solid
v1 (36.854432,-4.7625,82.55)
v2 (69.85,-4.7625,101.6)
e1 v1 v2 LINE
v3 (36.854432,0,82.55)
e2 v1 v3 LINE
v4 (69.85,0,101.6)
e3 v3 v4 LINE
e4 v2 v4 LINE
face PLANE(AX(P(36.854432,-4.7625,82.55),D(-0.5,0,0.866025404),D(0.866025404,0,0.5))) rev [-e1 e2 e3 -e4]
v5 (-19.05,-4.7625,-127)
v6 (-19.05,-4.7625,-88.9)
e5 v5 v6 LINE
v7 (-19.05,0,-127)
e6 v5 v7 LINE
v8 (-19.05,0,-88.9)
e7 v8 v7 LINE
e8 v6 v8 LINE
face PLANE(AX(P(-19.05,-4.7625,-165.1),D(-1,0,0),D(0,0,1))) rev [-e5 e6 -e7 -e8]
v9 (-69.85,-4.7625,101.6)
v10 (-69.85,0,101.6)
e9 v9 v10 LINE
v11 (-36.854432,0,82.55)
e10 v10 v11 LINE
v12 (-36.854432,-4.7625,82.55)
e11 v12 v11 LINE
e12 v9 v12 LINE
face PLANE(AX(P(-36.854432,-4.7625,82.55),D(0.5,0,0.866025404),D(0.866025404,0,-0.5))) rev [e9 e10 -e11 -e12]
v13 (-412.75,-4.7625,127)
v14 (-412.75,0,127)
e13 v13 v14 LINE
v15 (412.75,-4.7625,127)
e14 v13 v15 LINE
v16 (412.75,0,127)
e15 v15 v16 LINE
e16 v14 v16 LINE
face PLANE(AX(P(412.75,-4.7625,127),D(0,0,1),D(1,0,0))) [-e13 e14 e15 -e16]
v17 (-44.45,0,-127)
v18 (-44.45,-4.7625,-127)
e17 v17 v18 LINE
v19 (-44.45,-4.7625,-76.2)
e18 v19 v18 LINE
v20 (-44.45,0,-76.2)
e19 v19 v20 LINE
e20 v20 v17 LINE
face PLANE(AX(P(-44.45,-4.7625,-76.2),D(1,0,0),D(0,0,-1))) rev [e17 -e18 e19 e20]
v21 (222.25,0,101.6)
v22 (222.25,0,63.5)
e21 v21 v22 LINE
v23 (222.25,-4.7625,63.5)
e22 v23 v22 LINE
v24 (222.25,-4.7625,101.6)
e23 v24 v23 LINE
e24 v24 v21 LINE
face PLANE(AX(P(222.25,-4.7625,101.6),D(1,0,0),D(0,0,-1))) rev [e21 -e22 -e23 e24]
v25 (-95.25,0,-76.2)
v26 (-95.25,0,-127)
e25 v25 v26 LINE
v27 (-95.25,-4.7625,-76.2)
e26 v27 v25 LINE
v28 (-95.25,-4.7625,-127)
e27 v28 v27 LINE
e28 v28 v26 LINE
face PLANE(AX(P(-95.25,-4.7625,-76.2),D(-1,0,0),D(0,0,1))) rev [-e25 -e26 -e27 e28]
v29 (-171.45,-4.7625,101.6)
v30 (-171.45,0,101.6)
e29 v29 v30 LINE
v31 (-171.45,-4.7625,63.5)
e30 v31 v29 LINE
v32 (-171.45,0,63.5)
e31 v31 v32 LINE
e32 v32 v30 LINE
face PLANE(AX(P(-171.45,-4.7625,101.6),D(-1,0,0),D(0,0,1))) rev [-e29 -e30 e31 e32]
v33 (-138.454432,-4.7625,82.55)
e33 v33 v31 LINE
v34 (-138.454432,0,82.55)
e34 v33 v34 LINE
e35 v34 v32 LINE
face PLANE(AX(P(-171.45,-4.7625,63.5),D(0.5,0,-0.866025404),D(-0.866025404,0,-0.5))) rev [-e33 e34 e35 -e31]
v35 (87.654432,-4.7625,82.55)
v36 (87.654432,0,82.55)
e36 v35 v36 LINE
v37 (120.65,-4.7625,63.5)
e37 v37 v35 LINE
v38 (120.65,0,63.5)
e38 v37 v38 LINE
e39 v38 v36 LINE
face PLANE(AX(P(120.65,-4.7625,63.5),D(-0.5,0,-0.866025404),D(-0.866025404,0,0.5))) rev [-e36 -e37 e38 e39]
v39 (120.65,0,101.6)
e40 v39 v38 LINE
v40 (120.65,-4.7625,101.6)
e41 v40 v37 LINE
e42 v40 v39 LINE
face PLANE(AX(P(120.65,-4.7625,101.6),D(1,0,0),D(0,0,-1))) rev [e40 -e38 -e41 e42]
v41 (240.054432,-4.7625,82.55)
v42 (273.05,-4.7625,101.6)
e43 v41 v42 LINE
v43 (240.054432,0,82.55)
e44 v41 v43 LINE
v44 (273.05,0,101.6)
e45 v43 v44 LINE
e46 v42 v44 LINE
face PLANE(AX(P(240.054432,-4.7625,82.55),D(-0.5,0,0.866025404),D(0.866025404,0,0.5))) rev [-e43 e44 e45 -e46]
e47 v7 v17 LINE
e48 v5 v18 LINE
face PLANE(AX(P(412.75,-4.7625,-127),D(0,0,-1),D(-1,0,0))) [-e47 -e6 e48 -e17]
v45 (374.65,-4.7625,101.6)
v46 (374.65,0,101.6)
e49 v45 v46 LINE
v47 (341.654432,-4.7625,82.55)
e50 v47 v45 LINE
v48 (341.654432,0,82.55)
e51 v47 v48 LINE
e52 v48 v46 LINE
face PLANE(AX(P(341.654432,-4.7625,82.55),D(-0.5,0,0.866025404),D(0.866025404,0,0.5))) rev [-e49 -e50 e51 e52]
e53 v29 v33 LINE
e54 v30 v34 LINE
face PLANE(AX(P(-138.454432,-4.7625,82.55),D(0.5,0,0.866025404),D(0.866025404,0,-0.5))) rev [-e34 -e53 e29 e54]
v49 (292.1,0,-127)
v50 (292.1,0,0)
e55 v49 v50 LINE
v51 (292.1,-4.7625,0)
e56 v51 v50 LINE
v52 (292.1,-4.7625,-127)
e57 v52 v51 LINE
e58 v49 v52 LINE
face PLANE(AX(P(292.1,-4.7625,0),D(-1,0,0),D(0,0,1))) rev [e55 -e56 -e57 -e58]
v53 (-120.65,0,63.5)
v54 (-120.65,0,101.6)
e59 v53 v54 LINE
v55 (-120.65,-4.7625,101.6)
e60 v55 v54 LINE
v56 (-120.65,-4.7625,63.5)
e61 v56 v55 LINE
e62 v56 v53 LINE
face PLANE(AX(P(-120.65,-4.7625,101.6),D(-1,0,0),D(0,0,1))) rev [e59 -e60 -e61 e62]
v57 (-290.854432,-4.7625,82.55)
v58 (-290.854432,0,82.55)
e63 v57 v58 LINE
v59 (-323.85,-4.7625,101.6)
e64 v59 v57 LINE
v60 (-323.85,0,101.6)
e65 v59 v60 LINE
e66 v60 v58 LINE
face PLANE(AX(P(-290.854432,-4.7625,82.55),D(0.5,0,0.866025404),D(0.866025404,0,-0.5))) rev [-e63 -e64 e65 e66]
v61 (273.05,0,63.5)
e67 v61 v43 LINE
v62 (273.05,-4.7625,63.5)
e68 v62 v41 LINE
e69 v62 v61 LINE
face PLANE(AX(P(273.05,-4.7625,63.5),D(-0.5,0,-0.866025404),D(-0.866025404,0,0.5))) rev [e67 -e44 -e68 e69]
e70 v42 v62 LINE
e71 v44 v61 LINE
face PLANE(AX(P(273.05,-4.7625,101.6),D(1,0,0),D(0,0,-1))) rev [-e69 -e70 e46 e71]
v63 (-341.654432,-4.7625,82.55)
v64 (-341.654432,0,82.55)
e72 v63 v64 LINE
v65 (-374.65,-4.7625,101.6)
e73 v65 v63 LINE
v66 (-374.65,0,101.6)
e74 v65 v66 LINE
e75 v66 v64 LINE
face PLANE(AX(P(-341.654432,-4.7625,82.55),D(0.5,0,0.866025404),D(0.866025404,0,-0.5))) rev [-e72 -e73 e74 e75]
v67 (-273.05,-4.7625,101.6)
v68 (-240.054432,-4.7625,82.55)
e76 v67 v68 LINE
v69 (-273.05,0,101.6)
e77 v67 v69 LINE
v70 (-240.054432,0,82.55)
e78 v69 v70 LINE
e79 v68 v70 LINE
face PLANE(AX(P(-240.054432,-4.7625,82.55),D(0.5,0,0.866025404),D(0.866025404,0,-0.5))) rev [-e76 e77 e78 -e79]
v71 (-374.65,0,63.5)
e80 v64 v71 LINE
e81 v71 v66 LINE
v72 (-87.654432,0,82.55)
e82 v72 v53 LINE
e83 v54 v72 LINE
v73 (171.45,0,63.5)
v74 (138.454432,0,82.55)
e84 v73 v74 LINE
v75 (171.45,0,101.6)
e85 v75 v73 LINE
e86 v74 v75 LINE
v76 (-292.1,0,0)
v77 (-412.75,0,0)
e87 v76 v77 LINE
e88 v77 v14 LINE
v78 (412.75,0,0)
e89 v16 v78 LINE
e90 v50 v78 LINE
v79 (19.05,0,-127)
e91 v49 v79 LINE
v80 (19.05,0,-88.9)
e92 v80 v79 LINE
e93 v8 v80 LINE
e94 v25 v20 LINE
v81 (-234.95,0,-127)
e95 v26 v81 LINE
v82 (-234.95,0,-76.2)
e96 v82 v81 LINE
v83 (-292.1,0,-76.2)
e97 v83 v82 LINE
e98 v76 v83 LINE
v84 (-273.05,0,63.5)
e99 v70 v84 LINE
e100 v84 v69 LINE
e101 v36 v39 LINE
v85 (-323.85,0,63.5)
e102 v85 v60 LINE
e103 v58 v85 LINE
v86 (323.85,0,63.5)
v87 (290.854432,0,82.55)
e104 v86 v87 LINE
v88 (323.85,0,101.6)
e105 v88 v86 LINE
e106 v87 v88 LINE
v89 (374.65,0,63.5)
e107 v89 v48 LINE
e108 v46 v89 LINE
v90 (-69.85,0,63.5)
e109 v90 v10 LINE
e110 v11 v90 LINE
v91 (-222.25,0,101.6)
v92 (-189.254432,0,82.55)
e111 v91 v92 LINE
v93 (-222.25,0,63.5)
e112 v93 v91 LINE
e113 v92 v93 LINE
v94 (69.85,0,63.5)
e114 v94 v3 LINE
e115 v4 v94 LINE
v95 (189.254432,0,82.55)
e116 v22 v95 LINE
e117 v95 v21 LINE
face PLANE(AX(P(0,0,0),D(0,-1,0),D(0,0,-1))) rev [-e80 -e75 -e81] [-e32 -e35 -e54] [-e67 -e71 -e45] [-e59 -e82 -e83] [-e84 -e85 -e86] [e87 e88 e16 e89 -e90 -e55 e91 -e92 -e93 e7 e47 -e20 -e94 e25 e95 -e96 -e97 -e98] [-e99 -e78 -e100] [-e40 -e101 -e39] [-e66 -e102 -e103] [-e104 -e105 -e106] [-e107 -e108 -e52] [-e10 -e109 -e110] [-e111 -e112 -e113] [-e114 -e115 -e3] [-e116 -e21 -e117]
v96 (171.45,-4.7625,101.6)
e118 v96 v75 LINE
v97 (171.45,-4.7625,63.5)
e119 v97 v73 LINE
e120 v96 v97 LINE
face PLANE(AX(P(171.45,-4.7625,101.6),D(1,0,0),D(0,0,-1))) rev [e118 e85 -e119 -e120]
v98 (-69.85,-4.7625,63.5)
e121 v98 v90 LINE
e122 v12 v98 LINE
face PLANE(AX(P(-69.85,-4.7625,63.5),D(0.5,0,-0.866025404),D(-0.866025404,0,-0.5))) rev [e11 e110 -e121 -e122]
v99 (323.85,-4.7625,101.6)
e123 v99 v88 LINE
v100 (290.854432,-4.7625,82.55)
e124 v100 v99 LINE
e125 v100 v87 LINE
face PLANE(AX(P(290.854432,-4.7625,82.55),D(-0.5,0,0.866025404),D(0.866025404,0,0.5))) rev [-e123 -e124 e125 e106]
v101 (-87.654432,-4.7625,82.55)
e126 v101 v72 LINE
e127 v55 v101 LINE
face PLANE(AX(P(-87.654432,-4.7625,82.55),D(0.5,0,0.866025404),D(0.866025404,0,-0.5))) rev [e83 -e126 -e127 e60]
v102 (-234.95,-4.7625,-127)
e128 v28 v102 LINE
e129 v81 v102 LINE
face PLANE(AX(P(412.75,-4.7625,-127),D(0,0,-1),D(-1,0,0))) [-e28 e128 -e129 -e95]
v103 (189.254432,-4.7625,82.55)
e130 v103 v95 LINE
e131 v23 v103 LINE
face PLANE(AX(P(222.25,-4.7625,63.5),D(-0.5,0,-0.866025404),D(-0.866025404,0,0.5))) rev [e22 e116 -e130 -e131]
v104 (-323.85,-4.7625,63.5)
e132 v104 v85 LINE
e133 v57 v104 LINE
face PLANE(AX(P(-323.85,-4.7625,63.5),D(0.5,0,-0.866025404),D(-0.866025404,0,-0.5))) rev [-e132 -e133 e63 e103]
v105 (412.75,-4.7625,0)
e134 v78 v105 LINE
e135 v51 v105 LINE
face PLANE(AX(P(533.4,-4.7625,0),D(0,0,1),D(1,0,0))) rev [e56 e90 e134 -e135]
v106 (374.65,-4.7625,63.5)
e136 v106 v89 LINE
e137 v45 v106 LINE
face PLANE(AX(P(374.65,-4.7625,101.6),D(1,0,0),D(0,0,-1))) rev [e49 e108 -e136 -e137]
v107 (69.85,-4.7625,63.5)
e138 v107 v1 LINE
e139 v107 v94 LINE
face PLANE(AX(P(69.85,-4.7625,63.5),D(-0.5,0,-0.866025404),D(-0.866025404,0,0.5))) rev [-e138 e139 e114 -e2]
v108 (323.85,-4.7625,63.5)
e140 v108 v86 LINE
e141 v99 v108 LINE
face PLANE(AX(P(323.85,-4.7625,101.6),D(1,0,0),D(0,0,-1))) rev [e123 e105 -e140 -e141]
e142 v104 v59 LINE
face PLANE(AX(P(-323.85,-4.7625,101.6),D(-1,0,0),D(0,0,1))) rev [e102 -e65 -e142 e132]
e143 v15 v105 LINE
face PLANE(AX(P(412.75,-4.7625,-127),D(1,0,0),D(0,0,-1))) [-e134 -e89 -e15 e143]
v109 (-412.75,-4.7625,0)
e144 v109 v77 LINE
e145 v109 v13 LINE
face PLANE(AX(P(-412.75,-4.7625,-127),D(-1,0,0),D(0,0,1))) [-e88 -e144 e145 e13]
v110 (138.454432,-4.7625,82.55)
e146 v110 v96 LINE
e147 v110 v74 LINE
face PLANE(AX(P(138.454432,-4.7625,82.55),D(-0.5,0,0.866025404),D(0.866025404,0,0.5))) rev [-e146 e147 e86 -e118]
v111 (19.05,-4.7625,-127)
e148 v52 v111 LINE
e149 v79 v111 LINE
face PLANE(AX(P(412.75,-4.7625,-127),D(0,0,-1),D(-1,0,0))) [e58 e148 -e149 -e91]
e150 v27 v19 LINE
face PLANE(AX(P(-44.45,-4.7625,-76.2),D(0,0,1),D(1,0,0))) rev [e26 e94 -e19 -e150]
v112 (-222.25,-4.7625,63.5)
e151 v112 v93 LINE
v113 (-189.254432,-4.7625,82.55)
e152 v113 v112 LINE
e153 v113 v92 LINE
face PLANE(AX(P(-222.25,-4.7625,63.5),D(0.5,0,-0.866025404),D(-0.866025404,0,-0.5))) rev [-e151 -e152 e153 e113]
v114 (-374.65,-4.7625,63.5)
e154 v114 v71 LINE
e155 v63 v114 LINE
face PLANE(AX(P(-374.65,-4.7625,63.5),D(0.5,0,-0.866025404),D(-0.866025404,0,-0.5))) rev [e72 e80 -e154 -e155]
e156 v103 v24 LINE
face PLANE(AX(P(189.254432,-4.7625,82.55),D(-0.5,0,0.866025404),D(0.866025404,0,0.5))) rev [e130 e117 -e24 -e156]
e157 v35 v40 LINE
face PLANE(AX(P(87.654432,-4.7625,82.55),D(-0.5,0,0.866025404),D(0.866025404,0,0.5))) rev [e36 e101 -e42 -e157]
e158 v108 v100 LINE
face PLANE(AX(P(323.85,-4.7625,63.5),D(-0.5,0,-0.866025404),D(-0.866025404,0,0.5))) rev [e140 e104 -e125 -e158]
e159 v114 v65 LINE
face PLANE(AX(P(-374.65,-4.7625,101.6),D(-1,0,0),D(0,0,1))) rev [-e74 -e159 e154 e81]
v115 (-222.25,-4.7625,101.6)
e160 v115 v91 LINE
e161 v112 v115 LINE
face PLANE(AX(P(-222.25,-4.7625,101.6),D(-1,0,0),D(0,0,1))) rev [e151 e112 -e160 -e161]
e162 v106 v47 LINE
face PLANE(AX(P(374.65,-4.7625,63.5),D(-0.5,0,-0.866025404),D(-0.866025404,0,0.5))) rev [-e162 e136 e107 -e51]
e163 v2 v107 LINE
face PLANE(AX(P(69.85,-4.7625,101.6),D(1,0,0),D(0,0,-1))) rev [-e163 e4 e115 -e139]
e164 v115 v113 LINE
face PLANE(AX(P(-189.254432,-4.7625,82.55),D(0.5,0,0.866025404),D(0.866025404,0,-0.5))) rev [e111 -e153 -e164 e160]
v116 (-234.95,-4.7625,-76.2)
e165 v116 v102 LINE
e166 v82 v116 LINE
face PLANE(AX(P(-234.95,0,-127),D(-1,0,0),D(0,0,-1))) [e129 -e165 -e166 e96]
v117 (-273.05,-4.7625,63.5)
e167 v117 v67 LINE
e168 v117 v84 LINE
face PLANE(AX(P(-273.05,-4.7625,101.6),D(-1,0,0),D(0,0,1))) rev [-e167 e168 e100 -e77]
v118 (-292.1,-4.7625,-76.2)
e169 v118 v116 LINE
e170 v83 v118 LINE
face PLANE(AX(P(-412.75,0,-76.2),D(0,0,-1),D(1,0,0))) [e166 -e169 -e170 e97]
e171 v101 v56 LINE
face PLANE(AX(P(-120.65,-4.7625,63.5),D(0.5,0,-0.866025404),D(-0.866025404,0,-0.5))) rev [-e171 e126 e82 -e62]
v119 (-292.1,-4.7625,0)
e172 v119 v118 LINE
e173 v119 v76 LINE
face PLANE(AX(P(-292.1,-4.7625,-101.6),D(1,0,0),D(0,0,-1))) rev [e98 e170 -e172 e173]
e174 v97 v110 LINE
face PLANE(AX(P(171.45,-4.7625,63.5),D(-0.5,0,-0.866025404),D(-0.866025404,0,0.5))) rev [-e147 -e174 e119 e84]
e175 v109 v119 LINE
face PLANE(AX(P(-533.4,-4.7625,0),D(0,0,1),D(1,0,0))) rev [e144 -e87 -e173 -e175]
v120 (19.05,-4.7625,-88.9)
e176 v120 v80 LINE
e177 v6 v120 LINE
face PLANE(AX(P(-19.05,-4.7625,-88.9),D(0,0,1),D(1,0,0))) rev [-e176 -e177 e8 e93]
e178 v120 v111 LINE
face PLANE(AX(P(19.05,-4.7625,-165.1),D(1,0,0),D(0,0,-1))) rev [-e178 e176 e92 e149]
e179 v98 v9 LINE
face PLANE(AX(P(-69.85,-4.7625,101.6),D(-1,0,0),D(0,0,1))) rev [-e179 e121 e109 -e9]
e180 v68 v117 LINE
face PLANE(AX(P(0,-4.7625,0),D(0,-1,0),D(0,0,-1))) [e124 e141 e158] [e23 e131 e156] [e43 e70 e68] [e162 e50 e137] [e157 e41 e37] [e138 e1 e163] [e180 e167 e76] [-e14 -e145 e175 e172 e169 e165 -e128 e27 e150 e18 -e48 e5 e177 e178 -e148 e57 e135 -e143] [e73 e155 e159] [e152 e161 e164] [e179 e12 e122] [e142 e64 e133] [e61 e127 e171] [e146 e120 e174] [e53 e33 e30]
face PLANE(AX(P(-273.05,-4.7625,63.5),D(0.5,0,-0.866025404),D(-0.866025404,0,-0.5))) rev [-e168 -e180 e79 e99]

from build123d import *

# Parameters (mm, degrees)
SKETCH1_W          = 825.5
SKETCH1_H          = 254
BASE_FLANGE1_DEPTH = 4.7625
SKETCH6_W          = 38.1
SKETCH6_H          = 76.2
SKETCH6_W_2        = 241.3
SKETCH6_H_2        = 101.6
SKETCH6_W_3        = 50.8
CUT_EXTRUDE1_DEPTH = 432.872948801
SKETCH7_W          = 177.8
SKETCH7_H          = 50.8
SKETCH7_W_2        = 120.65
SKETCH7_H_2        = 25.4
CUT_EXTRUDE2_DEPTH = 432.872948801
CUT_EXTRUDE3_DEPTH = 432.872948801


# Sheet-metal steps are written as plain solids
with BuildPart() as part:
    # Sketch1 → Base-Flange1 (new body)
    with BuildSketch(Plane(origin=(0, 0, 0), x_dir=(1, 0, 0), z_dir=(0, 1, 0))):
        Rectangle(SKETCH1_W, SKETCH1_H)
    extrude(amount=-BASE_FLANGE1_DEPTH)

    # Sketch6 → Cut-Extrude1 (cut, through all)
    with BuildSketch(Plane(origin=(0, 0, 0), x_dir=(1, 0, 0), z_dir=(0, 1, 0))):
        with Locations((0, 127)):
            Rectangle(SKETCH6_W, SKETCH6_H)
        with Locations((-412.75, 50.8)):
            Rectangle(SKETCH6_W_2, SKETCH6_H_2)
        with Locations((412.75, 50.8)):
            Rectangle(SKETCH6_W_2, SKETCH6_H_2)
        with Locations((-69.85, 127)):
            Rectangle(SKETCH6_W_3, SKETCH6_H_2)
    extrude(amount=-CUT_EXTRUDE1_DEPTH, mode=Mode.SUBTRACT)

    # Sketch7 → Cut-Extrude2 (cut, through all)
    with BuildSketch(Plane(origin=(0, 0, 0), x_dir=(1, 0, 0), z_dir=(0, 1, 0))):
        with Locations((-323.85, 101.6)):
            Rectangle(SKETCH7_W, SKETCH7_H)
        with Locations((352.425, 114.3)):
            Rectangle(SKETCH7_W_2, SKETCH7_H_2)
    extrude(amount=-CUT_EXTRUDE2_DEPTH, mode=Mode.SUBTRACT)

    # Sketch8 → Cut-Extrude3 (cut, through all)
    with BuildSketch(Plane(origin=(0, 0, 0), x_dir=(1, 0, 0), z_dir=(0, 1, 0))):
        Polygon((341.654432116, -82.55), (374.65, -101.6), (374.65, -63.5), align=None)
        Polygon((323.85, -101.6), (323.85, -63.5), (290.854432116, -82.55), align=None)
        Polygon((273.05, -101.6), (273.05, -63.5), (240.054432116, -82.55), align=None)
        Polygon((222.25, -101.6), (222.25, -63.5), (189.254432116, -82.55), align=None)
        Polygon((171.45, -101.6), (171.45, -63.5), (138.454432116, -82.55), align=None)
        Polygon((120.65, -101.6), (120.65, -63.5), (87.654432116, -82.55), align=None)
        Polygon((69.85, -101.6), (69.85, -63.5), (36.854432116, -82.55), align=None)
        Polygon((-36.854432116, -82.55), (-69.85, -101.6), (-69.85, -63.5), align=None)
        Polygon((-87.654432116, -82.55), (-120.65, -101.6), (-120.65, -63.5), align=None)
        Polygon((-138.454432116, -82.55), (-171.45, -101.6), (-171.45, -63.5), align=None)
        Polygon((-189.254432116, -82.55), (-222.25, -101.6), (-222.25, -63.5), align=None)
        Polygon((-240.054432116, -82.55), (-273.05, -101.6), (-273.05, -63.5), align=None)
        Polygon((-290.854432116, -82.55), (-323.85, -101.6), (-323.85, -63.5), align=None)
        Polygon((-374.65, -63.5), (-341.654432116, -82.55), (-374.65, -101.6), align=None)
    extrude(amount=-CUT_EXTRUDE3_DEPTH, mode=Mode.SUBTRACT)


solid = part.part
